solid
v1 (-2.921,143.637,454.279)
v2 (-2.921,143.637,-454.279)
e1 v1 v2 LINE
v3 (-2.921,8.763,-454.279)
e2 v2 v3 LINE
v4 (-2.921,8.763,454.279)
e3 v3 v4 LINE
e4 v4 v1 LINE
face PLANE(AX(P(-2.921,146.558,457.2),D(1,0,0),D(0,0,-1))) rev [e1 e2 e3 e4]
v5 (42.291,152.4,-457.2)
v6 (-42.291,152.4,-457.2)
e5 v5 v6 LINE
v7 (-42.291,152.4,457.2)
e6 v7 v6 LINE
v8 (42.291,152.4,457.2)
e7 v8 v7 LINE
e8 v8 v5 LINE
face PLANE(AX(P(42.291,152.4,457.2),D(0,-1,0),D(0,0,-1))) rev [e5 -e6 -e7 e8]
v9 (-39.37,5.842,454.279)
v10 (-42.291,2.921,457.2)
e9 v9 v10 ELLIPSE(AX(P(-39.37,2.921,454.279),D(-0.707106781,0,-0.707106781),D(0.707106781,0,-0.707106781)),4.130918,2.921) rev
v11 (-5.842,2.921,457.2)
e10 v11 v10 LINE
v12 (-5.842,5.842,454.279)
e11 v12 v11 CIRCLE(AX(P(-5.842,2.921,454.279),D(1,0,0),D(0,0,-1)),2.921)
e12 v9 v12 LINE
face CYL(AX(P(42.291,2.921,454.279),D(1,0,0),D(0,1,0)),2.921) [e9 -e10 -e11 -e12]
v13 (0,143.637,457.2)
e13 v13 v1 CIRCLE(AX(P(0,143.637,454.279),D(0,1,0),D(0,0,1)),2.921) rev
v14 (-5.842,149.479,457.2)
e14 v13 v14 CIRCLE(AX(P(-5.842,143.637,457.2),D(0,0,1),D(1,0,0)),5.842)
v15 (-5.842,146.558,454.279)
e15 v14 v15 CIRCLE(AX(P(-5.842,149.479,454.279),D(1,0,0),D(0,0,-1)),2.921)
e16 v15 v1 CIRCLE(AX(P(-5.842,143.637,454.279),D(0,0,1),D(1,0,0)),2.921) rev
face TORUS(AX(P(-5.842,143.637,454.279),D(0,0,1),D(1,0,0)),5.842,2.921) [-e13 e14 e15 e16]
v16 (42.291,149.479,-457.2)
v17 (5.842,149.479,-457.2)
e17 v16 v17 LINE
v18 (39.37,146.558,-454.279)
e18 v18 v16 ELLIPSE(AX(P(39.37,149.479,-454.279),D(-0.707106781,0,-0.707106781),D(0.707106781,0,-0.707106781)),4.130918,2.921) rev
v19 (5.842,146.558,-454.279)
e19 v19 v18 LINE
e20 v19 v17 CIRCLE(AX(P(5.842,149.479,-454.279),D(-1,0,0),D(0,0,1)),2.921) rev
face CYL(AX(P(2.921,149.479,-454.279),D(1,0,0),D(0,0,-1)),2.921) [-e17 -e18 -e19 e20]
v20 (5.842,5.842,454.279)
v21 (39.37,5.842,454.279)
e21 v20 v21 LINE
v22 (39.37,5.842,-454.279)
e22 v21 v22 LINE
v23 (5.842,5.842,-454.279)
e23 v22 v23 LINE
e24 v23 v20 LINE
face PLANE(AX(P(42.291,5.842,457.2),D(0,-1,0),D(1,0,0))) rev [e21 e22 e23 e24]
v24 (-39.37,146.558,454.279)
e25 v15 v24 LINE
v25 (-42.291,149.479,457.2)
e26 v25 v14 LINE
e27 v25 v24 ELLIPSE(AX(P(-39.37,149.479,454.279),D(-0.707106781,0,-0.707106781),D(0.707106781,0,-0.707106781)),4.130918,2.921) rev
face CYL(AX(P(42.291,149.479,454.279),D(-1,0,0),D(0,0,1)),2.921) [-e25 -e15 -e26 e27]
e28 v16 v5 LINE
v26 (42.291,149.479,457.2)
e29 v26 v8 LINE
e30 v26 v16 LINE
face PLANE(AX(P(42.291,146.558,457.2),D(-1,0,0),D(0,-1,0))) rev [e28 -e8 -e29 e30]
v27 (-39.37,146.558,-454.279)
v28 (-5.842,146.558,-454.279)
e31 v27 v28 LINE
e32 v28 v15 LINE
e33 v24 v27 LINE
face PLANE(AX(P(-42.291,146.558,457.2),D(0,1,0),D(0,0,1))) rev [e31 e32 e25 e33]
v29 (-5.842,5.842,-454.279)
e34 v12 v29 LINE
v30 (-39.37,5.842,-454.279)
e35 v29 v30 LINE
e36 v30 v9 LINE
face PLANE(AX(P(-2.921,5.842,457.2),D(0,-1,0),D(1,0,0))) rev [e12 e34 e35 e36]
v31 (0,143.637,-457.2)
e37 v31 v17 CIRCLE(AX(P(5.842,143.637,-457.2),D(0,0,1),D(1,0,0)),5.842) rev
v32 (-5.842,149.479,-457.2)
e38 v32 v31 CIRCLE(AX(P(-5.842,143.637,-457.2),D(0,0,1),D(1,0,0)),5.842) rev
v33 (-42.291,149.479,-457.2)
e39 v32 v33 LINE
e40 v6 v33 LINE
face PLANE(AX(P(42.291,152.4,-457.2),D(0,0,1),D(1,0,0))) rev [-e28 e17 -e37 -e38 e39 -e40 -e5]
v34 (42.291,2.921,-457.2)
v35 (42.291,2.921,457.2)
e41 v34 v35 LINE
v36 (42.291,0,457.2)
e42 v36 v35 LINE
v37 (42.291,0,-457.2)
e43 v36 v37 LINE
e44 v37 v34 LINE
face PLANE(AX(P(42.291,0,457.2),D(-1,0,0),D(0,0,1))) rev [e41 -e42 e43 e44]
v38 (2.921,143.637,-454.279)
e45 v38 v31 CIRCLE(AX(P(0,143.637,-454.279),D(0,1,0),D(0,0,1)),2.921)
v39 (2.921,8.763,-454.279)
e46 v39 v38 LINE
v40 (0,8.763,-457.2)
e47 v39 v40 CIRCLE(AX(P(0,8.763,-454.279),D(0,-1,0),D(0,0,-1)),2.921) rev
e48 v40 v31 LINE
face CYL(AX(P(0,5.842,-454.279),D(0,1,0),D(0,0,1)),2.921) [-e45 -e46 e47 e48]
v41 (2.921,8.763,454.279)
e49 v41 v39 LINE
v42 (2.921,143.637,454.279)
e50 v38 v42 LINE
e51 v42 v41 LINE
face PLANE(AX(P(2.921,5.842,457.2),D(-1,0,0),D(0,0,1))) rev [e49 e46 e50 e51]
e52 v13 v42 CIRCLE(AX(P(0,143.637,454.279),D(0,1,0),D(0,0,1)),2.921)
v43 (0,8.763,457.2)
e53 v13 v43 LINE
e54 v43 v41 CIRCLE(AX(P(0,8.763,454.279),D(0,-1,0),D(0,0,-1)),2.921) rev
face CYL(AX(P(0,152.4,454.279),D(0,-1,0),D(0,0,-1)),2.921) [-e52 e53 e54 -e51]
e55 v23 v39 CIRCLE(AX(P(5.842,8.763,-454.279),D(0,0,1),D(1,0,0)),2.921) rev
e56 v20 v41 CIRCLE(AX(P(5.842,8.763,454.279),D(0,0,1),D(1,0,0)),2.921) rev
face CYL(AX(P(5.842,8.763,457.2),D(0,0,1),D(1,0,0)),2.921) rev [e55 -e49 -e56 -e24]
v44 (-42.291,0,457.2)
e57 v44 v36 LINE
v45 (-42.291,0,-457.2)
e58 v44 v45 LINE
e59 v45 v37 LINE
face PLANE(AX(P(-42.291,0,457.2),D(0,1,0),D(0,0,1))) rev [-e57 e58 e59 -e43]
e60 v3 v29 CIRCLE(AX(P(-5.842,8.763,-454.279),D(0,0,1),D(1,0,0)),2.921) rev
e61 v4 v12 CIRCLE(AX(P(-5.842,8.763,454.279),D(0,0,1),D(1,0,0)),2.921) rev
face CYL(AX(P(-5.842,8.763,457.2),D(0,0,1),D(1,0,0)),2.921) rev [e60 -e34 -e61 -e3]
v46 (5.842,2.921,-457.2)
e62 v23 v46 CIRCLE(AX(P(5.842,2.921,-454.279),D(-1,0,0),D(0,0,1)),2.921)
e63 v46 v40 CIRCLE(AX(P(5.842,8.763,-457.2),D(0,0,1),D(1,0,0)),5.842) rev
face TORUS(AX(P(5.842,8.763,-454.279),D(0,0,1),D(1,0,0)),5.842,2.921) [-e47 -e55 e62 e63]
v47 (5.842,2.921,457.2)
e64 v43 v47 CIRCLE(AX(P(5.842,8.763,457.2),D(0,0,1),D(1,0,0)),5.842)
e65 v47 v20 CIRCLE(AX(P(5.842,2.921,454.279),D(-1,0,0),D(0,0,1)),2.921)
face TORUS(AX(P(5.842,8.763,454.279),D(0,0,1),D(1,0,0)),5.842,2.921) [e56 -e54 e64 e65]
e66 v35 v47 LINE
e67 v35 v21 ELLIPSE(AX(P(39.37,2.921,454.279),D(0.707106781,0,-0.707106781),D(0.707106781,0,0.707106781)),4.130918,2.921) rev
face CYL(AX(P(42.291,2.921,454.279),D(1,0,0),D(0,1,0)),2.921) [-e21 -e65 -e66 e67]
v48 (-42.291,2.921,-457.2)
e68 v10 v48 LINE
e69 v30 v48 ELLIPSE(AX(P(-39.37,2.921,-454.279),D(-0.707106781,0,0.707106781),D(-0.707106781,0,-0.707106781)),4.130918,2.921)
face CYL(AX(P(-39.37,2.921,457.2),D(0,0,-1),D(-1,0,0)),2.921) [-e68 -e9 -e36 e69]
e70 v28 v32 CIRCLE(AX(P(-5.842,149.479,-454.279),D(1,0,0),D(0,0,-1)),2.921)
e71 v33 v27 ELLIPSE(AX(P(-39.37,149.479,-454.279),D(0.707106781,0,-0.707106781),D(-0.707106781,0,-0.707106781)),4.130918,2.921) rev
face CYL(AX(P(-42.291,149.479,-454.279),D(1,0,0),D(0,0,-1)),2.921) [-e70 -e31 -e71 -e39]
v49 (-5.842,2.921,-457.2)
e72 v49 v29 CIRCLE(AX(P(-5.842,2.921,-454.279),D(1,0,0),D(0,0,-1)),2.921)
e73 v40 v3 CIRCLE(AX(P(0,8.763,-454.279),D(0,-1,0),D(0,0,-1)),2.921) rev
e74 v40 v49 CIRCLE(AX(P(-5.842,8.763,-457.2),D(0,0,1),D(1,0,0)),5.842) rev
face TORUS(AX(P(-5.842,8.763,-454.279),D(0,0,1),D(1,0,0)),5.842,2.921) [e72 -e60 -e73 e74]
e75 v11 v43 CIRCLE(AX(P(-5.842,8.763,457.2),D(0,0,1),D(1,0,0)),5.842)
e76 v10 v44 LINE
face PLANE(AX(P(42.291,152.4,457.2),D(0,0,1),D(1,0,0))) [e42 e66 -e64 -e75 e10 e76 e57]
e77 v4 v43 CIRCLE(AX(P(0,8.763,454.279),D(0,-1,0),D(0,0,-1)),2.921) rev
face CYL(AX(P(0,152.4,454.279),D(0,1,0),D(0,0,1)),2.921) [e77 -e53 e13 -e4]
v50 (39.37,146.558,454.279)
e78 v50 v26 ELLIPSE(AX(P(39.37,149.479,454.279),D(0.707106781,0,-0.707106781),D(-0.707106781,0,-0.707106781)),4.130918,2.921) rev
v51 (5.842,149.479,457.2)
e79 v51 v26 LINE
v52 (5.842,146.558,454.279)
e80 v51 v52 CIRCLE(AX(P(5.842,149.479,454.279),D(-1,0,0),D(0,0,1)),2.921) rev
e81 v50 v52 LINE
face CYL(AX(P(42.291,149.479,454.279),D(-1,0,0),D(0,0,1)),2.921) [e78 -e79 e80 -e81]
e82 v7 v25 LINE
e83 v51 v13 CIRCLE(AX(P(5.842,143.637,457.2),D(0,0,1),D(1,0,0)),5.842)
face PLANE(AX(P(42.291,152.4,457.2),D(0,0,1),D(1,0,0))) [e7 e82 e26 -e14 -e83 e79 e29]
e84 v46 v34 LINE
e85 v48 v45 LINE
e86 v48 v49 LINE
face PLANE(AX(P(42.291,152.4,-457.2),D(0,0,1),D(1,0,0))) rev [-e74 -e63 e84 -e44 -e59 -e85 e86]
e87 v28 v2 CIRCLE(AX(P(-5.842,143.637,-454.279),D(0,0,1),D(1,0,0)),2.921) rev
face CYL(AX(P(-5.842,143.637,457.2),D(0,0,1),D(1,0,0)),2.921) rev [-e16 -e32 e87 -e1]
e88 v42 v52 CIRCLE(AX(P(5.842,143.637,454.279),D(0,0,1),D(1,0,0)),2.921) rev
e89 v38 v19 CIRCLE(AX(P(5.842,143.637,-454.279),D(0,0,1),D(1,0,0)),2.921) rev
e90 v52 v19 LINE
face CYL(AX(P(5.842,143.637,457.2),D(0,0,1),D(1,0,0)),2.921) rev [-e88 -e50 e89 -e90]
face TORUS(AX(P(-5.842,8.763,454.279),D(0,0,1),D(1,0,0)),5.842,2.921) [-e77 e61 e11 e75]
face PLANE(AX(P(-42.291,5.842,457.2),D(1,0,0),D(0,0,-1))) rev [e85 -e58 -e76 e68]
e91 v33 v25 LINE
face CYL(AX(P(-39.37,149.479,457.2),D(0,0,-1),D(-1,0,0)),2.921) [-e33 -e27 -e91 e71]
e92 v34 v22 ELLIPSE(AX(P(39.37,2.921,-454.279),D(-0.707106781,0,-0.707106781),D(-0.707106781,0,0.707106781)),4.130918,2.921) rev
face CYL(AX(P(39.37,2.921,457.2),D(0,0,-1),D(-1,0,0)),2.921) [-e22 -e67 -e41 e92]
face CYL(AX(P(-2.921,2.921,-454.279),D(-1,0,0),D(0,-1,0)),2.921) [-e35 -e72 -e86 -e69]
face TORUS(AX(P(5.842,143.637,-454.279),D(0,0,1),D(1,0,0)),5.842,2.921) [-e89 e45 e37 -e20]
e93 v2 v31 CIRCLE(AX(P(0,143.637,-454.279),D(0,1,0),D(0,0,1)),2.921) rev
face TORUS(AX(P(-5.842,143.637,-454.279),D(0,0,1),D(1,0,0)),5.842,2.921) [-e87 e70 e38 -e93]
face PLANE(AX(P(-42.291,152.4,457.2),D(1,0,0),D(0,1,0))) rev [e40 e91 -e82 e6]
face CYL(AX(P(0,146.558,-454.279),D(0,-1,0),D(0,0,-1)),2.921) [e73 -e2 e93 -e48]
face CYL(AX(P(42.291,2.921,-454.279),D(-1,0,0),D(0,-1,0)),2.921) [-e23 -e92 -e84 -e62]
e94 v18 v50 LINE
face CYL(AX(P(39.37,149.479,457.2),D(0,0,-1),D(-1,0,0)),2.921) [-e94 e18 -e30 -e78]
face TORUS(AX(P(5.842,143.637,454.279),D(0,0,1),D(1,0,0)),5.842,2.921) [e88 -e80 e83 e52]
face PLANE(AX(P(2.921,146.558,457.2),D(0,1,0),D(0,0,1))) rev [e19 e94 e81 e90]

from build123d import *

# Parameters (mm, degrees)
BOSS_EXTRUDE1_DEPTH = 457.2
FILLET1_R           = 2.921


with BuildPart() as part:
    # Sketch1 → Boss-Extrude1 (new, symmetric)
    with BuildSketch(Plane.XY):
        Polygon((42.291, 152.4), (-42.291, 152.4), (-42.291, 146.558), (-2.921, 146.558), (-2.921, 5.842), (-42.291, 5.842), (-42.291, 0), (42.291, 0), (42.291, 5.842), (2.921, 5.842), (2.921, 146.558), (42.291, 146.558), align=None)
    extrude(amount=BOSS_EXTRUDE1_DEPTH, both=True)

    # Fillet1
    fillet1_edges = [part.edges().sort_by_distance(p)[0] for p in [
        (22.606, 146.558, -457.2),
        (2.921, 76.2, -457.2),
        (22.606, 5.842, -457.2),
        (-22.606, 146.558, 457.2),
        (-22.606, 5.842, -457.2),
        (-2.921, 76.2, -457.2),
        (-22.606, 146.558, -457.2),
        (-2.921, 76.2, 457.2),
        (-22.606, 5.842, 457.2),
        (42.291, 146.558, 0),
        (2.921, 146.558, 0),
        (2.921, 5.842, 0),
        (42.291, 5.842, 0),
        (-42.291, 5.842, 0),
        (-2.921, 5.842, 0),
        (-2.921, 146.558, 0),
        (-42.291, 146.558, 0),
        (22.606, 5.842, 457.2),
        (2.921, 76.2, 457.2),
        (22.606, 146.558, 457.2),
    ]]
    fillet(fillet1_edges, radius=FILLET1_R - 0.0001)  # a hair under: the kernel refuses the full size


solid = part.part
